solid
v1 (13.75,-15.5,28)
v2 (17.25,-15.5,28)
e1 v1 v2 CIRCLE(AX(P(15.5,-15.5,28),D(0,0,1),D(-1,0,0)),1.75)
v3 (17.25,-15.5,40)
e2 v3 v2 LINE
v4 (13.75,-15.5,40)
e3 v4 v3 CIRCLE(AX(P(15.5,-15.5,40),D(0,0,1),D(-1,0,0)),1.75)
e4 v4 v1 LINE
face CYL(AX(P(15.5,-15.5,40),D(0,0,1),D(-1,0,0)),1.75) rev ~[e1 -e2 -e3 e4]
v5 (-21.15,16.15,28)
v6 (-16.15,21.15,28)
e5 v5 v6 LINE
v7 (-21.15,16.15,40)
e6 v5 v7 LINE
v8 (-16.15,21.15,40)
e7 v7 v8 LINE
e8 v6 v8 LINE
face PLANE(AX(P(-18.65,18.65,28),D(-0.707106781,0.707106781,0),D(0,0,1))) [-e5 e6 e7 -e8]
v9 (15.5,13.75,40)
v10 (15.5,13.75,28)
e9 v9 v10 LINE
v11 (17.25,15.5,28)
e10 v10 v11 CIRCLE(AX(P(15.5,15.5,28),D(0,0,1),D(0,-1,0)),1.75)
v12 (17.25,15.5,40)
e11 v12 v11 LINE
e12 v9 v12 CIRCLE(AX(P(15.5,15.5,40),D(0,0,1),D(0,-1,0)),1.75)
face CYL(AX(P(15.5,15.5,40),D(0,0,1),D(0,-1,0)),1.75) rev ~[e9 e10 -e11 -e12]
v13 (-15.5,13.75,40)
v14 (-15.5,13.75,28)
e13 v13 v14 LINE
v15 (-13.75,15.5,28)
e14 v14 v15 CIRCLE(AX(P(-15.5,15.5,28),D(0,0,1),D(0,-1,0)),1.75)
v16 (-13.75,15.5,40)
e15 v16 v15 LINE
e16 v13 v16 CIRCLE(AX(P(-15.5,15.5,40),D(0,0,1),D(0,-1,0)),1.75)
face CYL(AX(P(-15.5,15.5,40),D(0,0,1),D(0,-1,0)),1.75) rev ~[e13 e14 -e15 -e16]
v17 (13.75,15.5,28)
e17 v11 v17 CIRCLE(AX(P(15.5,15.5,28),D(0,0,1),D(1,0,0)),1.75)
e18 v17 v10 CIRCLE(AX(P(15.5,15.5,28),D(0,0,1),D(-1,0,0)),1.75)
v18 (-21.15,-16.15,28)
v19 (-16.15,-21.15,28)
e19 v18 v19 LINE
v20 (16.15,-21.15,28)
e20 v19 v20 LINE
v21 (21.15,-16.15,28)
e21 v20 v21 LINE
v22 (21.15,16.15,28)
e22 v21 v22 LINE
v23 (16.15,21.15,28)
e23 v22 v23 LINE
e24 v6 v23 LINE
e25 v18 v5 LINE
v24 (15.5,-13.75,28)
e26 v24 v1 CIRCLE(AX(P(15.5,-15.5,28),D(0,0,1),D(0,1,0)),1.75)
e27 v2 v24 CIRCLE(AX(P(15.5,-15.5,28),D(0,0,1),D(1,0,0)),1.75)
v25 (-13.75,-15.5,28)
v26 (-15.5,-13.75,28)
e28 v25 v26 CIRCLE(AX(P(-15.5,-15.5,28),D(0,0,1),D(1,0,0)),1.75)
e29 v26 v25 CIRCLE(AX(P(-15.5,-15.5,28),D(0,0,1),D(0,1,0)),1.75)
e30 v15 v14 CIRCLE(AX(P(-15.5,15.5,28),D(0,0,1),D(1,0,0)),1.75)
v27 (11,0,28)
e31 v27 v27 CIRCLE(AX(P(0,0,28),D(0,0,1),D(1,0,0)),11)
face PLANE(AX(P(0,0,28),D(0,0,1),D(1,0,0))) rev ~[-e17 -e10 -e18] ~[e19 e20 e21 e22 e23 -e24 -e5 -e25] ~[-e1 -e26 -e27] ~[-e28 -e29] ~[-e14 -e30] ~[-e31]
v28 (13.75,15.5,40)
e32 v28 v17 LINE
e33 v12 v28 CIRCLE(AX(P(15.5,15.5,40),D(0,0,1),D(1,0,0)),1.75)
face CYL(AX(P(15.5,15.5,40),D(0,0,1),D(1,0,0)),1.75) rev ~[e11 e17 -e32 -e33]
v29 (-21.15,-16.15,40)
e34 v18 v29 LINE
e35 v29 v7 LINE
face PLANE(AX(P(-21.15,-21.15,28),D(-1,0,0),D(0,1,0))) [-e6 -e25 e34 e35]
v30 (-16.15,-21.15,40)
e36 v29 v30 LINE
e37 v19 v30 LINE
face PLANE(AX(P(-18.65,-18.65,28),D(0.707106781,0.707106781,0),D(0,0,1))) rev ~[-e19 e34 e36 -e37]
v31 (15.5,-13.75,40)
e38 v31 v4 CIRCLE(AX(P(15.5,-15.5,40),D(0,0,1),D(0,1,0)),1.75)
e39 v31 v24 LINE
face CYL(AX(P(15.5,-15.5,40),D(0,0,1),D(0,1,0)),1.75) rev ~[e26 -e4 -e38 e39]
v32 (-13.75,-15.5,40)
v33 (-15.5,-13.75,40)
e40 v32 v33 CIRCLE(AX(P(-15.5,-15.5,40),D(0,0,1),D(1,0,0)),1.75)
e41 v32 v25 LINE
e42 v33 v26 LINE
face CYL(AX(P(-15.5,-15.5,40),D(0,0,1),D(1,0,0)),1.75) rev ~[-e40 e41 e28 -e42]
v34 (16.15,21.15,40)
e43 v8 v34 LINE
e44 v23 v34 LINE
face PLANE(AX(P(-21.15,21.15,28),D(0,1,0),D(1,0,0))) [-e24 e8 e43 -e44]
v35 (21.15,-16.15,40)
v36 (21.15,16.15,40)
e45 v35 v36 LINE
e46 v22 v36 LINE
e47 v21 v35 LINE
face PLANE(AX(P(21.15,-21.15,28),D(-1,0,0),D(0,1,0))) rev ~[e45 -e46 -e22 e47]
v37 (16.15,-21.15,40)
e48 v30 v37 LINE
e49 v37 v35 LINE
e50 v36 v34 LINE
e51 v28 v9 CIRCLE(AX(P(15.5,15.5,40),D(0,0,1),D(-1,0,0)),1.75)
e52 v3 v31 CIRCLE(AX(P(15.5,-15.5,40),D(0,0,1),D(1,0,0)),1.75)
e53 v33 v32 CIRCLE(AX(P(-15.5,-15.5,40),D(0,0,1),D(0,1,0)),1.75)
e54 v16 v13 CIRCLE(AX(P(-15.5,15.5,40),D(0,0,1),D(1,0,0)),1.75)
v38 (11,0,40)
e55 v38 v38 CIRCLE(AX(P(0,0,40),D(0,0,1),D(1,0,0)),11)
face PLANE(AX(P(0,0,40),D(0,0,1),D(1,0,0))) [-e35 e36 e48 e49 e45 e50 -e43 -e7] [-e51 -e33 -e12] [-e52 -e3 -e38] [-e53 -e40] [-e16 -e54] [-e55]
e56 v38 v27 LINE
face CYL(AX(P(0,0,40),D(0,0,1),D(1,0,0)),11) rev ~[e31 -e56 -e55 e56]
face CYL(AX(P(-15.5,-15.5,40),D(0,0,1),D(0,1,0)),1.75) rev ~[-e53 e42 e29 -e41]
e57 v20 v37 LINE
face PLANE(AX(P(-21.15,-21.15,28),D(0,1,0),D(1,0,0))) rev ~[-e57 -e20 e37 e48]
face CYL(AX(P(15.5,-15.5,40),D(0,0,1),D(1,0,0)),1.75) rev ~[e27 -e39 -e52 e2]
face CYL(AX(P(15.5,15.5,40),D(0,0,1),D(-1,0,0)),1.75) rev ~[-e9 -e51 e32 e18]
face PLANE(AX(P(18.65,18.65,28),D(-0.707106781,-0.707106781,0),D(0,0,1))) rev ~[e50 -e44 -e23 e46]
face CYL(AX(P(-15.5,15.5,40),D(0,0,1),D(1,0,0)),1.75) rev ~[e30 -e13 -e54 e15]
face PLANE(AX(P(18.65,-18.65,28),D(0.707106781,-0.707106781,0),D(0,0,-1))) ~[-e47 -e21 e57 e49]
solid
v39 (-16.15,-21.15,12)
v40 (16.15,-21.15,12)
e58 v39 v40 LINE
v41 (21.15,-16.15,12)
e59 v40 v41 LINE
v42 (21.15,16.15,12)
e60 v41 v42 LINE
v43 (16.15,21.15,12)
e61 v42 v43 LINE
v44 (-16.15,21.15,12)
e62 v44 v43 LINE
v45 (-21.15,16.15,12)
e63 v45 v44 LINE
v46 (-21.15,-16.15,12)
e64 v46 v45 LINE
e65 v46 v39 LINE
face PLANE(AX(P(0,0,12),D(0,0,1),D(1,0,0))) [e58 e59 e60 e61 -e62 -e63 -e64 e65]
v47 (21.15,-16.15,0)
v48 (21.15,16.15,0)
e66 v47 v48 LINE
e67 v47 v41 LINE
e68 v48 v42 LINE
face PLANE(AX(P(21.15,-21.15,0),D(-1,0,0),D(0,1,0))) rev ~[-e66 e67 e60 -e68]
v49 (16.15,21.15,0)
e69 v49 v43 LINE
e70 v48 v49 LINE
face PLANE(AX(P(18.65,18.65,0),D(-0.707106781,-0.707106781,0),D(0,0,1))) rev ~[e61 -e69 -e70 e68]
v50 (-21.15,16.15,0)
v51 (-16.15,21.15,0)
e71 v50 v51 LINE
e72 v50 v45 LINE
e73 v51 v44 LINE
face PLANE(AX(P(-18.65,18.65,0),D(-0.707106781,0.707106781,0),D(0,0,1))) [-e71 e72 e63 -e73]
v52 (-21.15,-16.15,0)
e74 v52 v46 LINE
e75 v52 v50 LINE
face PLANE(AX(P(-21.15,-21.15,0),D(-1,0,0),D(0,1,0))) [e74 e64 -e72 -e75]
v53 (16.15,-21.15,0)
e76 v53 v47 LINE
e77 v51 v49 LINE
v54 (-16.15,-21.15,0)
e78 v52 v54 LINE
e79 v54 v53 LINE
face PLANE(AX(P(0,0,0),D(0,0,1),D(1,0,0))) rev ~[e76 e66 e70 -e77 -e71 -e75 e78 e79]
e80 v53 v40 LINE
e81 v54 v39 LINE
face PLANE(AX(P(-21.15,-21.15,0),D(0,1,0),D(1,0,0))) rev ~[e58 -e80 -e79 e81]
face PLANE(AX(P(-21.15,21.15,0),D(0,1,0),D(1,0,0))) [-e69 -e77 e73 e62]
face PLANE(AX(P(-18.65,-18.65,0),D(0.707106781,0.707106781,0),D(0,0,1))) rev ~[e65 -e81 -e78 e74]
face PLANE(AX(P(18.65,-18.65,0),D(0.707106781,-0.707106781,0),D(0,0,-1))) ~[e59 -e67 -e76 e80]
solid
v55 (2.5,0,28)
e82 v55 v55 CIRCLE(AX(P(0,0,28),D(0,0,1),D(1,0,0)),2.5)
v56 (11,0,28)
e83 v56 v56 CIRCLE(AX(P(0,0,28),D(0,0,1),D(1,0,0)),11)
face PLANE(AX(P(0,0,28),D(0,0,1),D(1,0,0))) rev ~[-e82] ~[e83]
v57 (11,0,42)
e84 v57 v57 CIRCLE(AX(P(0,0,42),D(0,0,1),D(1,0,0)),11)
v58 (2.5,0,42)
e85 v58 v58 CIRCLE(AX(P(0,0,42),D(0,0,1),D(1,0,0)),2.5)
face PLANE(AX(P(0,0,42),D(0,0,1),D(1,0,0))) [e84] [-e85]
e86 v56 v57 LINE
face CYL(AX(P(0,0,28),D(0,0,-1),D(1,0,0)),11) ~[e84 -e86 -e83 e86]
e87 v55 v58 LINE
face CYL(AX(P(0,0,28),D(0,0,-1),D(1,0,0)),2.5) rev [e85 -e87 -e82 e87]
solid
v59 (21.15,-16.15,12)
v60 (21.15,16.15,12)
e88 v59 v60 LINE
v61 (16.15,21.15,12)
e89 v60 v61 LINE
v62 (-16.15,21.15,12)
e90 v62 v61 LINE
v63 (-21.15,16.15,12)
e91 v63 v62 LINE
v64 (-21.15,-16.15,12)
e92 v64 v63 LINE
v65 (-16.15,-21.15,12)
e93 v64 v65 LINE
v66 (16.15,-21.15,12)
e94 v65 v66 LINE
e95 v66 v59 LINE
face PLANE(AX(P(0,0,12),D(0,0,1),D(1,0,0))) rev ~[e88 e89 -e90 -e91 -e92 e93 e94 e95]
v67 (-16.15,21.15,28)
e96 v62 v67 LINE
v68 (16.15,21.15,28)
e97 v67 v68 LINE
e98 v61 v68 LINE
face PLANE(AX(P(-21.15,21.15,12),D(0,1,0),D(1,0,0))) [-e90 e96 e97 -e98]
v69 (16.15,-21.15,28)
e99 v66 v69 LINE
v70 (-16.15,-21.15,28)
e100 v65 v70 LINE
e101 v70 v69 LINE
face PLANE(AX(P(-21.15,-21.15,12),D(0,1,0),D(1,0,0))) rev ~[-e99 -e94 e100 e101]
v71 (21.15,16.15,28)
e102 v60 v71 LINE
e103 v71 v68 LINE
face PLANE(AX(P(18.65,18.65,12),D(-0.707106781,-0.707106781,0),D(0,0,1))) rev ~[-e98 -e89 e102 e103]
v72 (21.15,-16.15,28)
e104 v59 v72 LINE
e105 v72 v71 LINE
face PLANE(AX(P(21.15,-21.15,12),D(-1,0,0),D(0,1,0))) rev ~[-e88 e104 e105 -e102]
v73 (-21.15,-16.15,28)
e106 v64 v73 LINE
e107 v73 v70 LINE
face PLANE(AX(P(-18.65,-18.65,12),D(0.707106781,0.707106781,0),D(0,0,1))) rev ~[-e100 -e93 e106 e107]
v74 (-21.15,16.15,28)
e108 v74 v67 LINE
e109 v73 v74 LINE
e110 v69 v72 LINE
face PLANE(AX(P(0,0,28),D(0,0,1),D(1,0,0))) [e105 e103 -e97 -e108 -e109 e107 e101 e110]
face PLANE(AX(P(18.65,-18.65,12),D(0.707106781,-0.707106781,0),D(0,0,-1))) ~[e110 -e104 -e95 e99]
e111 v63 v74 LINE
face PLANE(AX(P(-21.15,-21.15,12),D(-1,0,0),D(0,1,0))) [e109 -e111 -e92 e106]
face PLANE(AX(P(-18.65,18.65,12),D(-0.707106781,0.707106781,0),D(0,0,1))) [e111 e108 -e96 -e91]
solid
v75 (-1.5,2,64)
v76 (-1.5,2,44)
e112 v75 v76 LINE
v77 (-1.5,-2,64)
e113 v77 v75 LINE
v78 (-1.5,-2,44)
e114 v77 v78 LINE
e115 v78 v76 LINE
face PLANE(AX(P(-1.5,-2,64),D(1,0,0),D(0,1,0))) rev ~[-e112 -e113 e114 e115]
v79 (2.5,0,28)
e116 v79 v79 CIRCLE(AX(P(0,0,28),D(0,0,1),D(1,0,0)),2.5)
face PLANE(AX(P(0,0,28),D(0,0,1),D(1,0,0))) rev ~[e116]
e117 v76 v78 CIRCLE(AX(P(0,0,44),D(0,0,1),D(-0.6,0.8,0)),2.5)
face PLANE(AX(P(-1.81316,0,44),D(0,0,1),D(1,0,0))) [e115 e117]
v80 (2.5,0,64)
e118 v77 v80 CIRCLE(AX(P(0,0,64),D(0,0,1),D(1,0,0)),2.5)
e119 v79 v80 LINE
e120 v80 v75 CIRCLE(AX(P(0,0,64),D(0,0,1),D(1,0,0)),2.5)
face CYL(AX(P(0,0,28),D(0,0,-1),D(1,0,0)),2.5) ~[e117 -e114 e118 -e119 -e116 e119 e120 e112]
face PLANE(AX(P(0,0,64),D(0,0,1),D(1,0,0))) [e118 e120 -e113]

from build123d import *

# Parameters (mm, degrees)
F0_W      = 42.3
F0_H      = 42.3
F1_DEPTH  = 12
F2_SIZE   = 5
F3_W      = 42.3
F3_H      = 42.3
F4_DEPTH  = 16
F5_SIZE   = 5
F6_W      = 42.3
F6_H      = 42.3
F7_DEPTH  = 12
F8_SIZE   = 5
F9_R      = 11
F10_DEPTH = 12
F11_R     = 11
F11_R_2   = 2.5
F12_DEPTH = 14
F13_R     = 2.5
F14_DEPTH = 36
F16_DEPTH = 20


with BuildPart() as f1:
    # F0 (on Top) → F1 (new body)
    with BuildSketch(Plane.XY):
        Rectangle(F0_W, F0_H)
    extrude(amount=F1_DEPTH)

    # F2
    f2_edges = [f1.edges().sort_by_distance(p)[0] for p in [
        (21.15, -21.15, 6),
        (21.15, 21.15, 6),
        (-21.15, -21.15, 6),
        (-21.15, 21.15, 6),
    ]]
    chamfer(f2_edges, length=F2_SIZE)


with BuildPart() as f4:
    # F3 (on face) → F4 (new body)
    with BuildSketch(Plane.XY.offset(12)):
        Rectangle(F3_W, F3_H)
    extrude(amount=F4_DEPTH)

    # F5
    f5_edges = [f4.edges().sort_by_distance(p)[0] for p in [
        (21.15, -21.15, 20),
        (21.15, 21.15, 20),
        (-21.15, -21.15, 20),
        (-21.15, 21.15, 20),
    ]]
    chamfer(f5_edges, length=F5_SIZE)


with BuildPart() as f7:
    # F6 (on face) → F7 (new body)
    with BuildSketch(Plane.XY.offset(28)):
        Rectangle(F6_W, F6_H)
    extrude(amount=F7_DEPTH)

    # F8
    f8_edges = [f7.edges().sort_by_distance(p)[0] for p in [
        (21.15, -21.15, 34),
        (21.15, 21.15, 34),
        (-21.15, 21.15, 34),
        (-21.15, -21.15, 34),
    ]]
    chamfer(f8_edges, length=F8_SIZE)

    # F9 (on face) → F10 (cut)
    with BuildSketch(Plane.XY.offset(40)):
        with BuildLine():
            Line((15.5, 15.5), (13.75, 15.5))
            ThreePointArc((13.75, 15.5), (14.2625631329, 14.2625631329), (15.5, 13.75))
            Line((15.5, 13.75), (15.5, 15.5))
        make_face()
        with BuildLine():
            ThreePointArc((17.25, 15.5), (15.5, 17.25), (13.75, 15.5))
            Line((13.75, 15.5), (15.5, 15.5))
            Line((15.5, 15.5), (15.5, 13.75))
            ThreePointArc((15.5, 13.75), (16.7374368671, 14.2625631329), (17.25, 15.5))
        make_face()
        with BuildLine():
            ThreePointArc((-15.5, 13.75), (-14.2625631329, 14.2625631329), (-13.75, 15.5))
            Line((-13.75, 15.5), (-15.5, 15.5))
            Line((-15.5, 15.5), (-15.5, 13.75))
        make_face()
        with BuildLine():
            Line((-15.5, 15.5), (-13.75, 15.5))
            ThreePointArc((-13.75, 15.5), (-16.7374368671, 16.7374368671), (-15.5, 13.75))
            Line((-15.5, 13.75), (-15.5, 15.5))
        make_face()
        with BuildLine():
            Line((15.5, -15.5), (15.5, -13.75))
            ThreePointArc((15.5, -13.75), (14.2625631329, -14.2625631329), (13.75, -15.5))
            Line((13.75, -15.5), (15.5, -15.5))
        make_face()
        with BuildLine():
            ThreePointArc((17.25, -15.5), (16.7374368671, -14.2625631329), (15.5, -13.75))
            Line((15.5, -13.75), (15.5, -15.5))
            Line((15.5, -15.5), (13.75, -15.5))
            ThreePointArc((13.75, -15.5), (15.5, -17.25), (17.25, -15.5))
        make_face()
        with BuildLine():
            ThreePointArc((-13.75, -15.5), (-14.2625631329, -14.2625631329), (-15.5, -13.75))
            Line((-15.5, -13.75), (-15.5, -15.5))
            Line((-15.5, -15.5), (-13.75, -15.5))
        make_face()
        with BuildLine():
            Line((-15.5, -15.5), (-15.5, -13.75))
            ThreePointArc((-15.5, -13.75), (-16.7374368671, -16.7374368671), (-13.75, -15.5))
            Line((-13.75, -15.5), (-15.5, -15.5))
        make_face()
        Circle(F9_R)
    extrude(amount=-F10_DEPTH, mode=Mode.SUBTRACT)


with BuildPart() as f12:
    # F11 (on face) → F12 (new body)
    with BuildSketch(Plane.XY.offset(28)):
        Circle(F11_R)
        Circle(F11_R_2, mode=Mode.SUBTRACT)
    extrude(amount=F12_DEPTH)


with BuildPart() as f14:
    # F13 (on face) → F14 (new body)
    with BuildSketch(Plane.XY.offset(28)):
        Circle(F13_R)
    extrude(amount=F14_DEPTH)

    # F15 (on face) → F16 (cut)
    with BuildSketch(Plane.XY.offset(64)):
        with BuildLine():
            Line((-1.5, -2), (-1.5, 0))
            Line((-1.5, 0), (-1.5, 2))
            ThreePointArc((-1.5, 2), (-2.5, 0), (-1.5, -2))
        make_face()
    extrude(amount=-F16_DEPTH, mode=Mode.SUBTRACT)


solid = Compound([f1.part, f4.part, f7.part, f12.part, f14.part])
